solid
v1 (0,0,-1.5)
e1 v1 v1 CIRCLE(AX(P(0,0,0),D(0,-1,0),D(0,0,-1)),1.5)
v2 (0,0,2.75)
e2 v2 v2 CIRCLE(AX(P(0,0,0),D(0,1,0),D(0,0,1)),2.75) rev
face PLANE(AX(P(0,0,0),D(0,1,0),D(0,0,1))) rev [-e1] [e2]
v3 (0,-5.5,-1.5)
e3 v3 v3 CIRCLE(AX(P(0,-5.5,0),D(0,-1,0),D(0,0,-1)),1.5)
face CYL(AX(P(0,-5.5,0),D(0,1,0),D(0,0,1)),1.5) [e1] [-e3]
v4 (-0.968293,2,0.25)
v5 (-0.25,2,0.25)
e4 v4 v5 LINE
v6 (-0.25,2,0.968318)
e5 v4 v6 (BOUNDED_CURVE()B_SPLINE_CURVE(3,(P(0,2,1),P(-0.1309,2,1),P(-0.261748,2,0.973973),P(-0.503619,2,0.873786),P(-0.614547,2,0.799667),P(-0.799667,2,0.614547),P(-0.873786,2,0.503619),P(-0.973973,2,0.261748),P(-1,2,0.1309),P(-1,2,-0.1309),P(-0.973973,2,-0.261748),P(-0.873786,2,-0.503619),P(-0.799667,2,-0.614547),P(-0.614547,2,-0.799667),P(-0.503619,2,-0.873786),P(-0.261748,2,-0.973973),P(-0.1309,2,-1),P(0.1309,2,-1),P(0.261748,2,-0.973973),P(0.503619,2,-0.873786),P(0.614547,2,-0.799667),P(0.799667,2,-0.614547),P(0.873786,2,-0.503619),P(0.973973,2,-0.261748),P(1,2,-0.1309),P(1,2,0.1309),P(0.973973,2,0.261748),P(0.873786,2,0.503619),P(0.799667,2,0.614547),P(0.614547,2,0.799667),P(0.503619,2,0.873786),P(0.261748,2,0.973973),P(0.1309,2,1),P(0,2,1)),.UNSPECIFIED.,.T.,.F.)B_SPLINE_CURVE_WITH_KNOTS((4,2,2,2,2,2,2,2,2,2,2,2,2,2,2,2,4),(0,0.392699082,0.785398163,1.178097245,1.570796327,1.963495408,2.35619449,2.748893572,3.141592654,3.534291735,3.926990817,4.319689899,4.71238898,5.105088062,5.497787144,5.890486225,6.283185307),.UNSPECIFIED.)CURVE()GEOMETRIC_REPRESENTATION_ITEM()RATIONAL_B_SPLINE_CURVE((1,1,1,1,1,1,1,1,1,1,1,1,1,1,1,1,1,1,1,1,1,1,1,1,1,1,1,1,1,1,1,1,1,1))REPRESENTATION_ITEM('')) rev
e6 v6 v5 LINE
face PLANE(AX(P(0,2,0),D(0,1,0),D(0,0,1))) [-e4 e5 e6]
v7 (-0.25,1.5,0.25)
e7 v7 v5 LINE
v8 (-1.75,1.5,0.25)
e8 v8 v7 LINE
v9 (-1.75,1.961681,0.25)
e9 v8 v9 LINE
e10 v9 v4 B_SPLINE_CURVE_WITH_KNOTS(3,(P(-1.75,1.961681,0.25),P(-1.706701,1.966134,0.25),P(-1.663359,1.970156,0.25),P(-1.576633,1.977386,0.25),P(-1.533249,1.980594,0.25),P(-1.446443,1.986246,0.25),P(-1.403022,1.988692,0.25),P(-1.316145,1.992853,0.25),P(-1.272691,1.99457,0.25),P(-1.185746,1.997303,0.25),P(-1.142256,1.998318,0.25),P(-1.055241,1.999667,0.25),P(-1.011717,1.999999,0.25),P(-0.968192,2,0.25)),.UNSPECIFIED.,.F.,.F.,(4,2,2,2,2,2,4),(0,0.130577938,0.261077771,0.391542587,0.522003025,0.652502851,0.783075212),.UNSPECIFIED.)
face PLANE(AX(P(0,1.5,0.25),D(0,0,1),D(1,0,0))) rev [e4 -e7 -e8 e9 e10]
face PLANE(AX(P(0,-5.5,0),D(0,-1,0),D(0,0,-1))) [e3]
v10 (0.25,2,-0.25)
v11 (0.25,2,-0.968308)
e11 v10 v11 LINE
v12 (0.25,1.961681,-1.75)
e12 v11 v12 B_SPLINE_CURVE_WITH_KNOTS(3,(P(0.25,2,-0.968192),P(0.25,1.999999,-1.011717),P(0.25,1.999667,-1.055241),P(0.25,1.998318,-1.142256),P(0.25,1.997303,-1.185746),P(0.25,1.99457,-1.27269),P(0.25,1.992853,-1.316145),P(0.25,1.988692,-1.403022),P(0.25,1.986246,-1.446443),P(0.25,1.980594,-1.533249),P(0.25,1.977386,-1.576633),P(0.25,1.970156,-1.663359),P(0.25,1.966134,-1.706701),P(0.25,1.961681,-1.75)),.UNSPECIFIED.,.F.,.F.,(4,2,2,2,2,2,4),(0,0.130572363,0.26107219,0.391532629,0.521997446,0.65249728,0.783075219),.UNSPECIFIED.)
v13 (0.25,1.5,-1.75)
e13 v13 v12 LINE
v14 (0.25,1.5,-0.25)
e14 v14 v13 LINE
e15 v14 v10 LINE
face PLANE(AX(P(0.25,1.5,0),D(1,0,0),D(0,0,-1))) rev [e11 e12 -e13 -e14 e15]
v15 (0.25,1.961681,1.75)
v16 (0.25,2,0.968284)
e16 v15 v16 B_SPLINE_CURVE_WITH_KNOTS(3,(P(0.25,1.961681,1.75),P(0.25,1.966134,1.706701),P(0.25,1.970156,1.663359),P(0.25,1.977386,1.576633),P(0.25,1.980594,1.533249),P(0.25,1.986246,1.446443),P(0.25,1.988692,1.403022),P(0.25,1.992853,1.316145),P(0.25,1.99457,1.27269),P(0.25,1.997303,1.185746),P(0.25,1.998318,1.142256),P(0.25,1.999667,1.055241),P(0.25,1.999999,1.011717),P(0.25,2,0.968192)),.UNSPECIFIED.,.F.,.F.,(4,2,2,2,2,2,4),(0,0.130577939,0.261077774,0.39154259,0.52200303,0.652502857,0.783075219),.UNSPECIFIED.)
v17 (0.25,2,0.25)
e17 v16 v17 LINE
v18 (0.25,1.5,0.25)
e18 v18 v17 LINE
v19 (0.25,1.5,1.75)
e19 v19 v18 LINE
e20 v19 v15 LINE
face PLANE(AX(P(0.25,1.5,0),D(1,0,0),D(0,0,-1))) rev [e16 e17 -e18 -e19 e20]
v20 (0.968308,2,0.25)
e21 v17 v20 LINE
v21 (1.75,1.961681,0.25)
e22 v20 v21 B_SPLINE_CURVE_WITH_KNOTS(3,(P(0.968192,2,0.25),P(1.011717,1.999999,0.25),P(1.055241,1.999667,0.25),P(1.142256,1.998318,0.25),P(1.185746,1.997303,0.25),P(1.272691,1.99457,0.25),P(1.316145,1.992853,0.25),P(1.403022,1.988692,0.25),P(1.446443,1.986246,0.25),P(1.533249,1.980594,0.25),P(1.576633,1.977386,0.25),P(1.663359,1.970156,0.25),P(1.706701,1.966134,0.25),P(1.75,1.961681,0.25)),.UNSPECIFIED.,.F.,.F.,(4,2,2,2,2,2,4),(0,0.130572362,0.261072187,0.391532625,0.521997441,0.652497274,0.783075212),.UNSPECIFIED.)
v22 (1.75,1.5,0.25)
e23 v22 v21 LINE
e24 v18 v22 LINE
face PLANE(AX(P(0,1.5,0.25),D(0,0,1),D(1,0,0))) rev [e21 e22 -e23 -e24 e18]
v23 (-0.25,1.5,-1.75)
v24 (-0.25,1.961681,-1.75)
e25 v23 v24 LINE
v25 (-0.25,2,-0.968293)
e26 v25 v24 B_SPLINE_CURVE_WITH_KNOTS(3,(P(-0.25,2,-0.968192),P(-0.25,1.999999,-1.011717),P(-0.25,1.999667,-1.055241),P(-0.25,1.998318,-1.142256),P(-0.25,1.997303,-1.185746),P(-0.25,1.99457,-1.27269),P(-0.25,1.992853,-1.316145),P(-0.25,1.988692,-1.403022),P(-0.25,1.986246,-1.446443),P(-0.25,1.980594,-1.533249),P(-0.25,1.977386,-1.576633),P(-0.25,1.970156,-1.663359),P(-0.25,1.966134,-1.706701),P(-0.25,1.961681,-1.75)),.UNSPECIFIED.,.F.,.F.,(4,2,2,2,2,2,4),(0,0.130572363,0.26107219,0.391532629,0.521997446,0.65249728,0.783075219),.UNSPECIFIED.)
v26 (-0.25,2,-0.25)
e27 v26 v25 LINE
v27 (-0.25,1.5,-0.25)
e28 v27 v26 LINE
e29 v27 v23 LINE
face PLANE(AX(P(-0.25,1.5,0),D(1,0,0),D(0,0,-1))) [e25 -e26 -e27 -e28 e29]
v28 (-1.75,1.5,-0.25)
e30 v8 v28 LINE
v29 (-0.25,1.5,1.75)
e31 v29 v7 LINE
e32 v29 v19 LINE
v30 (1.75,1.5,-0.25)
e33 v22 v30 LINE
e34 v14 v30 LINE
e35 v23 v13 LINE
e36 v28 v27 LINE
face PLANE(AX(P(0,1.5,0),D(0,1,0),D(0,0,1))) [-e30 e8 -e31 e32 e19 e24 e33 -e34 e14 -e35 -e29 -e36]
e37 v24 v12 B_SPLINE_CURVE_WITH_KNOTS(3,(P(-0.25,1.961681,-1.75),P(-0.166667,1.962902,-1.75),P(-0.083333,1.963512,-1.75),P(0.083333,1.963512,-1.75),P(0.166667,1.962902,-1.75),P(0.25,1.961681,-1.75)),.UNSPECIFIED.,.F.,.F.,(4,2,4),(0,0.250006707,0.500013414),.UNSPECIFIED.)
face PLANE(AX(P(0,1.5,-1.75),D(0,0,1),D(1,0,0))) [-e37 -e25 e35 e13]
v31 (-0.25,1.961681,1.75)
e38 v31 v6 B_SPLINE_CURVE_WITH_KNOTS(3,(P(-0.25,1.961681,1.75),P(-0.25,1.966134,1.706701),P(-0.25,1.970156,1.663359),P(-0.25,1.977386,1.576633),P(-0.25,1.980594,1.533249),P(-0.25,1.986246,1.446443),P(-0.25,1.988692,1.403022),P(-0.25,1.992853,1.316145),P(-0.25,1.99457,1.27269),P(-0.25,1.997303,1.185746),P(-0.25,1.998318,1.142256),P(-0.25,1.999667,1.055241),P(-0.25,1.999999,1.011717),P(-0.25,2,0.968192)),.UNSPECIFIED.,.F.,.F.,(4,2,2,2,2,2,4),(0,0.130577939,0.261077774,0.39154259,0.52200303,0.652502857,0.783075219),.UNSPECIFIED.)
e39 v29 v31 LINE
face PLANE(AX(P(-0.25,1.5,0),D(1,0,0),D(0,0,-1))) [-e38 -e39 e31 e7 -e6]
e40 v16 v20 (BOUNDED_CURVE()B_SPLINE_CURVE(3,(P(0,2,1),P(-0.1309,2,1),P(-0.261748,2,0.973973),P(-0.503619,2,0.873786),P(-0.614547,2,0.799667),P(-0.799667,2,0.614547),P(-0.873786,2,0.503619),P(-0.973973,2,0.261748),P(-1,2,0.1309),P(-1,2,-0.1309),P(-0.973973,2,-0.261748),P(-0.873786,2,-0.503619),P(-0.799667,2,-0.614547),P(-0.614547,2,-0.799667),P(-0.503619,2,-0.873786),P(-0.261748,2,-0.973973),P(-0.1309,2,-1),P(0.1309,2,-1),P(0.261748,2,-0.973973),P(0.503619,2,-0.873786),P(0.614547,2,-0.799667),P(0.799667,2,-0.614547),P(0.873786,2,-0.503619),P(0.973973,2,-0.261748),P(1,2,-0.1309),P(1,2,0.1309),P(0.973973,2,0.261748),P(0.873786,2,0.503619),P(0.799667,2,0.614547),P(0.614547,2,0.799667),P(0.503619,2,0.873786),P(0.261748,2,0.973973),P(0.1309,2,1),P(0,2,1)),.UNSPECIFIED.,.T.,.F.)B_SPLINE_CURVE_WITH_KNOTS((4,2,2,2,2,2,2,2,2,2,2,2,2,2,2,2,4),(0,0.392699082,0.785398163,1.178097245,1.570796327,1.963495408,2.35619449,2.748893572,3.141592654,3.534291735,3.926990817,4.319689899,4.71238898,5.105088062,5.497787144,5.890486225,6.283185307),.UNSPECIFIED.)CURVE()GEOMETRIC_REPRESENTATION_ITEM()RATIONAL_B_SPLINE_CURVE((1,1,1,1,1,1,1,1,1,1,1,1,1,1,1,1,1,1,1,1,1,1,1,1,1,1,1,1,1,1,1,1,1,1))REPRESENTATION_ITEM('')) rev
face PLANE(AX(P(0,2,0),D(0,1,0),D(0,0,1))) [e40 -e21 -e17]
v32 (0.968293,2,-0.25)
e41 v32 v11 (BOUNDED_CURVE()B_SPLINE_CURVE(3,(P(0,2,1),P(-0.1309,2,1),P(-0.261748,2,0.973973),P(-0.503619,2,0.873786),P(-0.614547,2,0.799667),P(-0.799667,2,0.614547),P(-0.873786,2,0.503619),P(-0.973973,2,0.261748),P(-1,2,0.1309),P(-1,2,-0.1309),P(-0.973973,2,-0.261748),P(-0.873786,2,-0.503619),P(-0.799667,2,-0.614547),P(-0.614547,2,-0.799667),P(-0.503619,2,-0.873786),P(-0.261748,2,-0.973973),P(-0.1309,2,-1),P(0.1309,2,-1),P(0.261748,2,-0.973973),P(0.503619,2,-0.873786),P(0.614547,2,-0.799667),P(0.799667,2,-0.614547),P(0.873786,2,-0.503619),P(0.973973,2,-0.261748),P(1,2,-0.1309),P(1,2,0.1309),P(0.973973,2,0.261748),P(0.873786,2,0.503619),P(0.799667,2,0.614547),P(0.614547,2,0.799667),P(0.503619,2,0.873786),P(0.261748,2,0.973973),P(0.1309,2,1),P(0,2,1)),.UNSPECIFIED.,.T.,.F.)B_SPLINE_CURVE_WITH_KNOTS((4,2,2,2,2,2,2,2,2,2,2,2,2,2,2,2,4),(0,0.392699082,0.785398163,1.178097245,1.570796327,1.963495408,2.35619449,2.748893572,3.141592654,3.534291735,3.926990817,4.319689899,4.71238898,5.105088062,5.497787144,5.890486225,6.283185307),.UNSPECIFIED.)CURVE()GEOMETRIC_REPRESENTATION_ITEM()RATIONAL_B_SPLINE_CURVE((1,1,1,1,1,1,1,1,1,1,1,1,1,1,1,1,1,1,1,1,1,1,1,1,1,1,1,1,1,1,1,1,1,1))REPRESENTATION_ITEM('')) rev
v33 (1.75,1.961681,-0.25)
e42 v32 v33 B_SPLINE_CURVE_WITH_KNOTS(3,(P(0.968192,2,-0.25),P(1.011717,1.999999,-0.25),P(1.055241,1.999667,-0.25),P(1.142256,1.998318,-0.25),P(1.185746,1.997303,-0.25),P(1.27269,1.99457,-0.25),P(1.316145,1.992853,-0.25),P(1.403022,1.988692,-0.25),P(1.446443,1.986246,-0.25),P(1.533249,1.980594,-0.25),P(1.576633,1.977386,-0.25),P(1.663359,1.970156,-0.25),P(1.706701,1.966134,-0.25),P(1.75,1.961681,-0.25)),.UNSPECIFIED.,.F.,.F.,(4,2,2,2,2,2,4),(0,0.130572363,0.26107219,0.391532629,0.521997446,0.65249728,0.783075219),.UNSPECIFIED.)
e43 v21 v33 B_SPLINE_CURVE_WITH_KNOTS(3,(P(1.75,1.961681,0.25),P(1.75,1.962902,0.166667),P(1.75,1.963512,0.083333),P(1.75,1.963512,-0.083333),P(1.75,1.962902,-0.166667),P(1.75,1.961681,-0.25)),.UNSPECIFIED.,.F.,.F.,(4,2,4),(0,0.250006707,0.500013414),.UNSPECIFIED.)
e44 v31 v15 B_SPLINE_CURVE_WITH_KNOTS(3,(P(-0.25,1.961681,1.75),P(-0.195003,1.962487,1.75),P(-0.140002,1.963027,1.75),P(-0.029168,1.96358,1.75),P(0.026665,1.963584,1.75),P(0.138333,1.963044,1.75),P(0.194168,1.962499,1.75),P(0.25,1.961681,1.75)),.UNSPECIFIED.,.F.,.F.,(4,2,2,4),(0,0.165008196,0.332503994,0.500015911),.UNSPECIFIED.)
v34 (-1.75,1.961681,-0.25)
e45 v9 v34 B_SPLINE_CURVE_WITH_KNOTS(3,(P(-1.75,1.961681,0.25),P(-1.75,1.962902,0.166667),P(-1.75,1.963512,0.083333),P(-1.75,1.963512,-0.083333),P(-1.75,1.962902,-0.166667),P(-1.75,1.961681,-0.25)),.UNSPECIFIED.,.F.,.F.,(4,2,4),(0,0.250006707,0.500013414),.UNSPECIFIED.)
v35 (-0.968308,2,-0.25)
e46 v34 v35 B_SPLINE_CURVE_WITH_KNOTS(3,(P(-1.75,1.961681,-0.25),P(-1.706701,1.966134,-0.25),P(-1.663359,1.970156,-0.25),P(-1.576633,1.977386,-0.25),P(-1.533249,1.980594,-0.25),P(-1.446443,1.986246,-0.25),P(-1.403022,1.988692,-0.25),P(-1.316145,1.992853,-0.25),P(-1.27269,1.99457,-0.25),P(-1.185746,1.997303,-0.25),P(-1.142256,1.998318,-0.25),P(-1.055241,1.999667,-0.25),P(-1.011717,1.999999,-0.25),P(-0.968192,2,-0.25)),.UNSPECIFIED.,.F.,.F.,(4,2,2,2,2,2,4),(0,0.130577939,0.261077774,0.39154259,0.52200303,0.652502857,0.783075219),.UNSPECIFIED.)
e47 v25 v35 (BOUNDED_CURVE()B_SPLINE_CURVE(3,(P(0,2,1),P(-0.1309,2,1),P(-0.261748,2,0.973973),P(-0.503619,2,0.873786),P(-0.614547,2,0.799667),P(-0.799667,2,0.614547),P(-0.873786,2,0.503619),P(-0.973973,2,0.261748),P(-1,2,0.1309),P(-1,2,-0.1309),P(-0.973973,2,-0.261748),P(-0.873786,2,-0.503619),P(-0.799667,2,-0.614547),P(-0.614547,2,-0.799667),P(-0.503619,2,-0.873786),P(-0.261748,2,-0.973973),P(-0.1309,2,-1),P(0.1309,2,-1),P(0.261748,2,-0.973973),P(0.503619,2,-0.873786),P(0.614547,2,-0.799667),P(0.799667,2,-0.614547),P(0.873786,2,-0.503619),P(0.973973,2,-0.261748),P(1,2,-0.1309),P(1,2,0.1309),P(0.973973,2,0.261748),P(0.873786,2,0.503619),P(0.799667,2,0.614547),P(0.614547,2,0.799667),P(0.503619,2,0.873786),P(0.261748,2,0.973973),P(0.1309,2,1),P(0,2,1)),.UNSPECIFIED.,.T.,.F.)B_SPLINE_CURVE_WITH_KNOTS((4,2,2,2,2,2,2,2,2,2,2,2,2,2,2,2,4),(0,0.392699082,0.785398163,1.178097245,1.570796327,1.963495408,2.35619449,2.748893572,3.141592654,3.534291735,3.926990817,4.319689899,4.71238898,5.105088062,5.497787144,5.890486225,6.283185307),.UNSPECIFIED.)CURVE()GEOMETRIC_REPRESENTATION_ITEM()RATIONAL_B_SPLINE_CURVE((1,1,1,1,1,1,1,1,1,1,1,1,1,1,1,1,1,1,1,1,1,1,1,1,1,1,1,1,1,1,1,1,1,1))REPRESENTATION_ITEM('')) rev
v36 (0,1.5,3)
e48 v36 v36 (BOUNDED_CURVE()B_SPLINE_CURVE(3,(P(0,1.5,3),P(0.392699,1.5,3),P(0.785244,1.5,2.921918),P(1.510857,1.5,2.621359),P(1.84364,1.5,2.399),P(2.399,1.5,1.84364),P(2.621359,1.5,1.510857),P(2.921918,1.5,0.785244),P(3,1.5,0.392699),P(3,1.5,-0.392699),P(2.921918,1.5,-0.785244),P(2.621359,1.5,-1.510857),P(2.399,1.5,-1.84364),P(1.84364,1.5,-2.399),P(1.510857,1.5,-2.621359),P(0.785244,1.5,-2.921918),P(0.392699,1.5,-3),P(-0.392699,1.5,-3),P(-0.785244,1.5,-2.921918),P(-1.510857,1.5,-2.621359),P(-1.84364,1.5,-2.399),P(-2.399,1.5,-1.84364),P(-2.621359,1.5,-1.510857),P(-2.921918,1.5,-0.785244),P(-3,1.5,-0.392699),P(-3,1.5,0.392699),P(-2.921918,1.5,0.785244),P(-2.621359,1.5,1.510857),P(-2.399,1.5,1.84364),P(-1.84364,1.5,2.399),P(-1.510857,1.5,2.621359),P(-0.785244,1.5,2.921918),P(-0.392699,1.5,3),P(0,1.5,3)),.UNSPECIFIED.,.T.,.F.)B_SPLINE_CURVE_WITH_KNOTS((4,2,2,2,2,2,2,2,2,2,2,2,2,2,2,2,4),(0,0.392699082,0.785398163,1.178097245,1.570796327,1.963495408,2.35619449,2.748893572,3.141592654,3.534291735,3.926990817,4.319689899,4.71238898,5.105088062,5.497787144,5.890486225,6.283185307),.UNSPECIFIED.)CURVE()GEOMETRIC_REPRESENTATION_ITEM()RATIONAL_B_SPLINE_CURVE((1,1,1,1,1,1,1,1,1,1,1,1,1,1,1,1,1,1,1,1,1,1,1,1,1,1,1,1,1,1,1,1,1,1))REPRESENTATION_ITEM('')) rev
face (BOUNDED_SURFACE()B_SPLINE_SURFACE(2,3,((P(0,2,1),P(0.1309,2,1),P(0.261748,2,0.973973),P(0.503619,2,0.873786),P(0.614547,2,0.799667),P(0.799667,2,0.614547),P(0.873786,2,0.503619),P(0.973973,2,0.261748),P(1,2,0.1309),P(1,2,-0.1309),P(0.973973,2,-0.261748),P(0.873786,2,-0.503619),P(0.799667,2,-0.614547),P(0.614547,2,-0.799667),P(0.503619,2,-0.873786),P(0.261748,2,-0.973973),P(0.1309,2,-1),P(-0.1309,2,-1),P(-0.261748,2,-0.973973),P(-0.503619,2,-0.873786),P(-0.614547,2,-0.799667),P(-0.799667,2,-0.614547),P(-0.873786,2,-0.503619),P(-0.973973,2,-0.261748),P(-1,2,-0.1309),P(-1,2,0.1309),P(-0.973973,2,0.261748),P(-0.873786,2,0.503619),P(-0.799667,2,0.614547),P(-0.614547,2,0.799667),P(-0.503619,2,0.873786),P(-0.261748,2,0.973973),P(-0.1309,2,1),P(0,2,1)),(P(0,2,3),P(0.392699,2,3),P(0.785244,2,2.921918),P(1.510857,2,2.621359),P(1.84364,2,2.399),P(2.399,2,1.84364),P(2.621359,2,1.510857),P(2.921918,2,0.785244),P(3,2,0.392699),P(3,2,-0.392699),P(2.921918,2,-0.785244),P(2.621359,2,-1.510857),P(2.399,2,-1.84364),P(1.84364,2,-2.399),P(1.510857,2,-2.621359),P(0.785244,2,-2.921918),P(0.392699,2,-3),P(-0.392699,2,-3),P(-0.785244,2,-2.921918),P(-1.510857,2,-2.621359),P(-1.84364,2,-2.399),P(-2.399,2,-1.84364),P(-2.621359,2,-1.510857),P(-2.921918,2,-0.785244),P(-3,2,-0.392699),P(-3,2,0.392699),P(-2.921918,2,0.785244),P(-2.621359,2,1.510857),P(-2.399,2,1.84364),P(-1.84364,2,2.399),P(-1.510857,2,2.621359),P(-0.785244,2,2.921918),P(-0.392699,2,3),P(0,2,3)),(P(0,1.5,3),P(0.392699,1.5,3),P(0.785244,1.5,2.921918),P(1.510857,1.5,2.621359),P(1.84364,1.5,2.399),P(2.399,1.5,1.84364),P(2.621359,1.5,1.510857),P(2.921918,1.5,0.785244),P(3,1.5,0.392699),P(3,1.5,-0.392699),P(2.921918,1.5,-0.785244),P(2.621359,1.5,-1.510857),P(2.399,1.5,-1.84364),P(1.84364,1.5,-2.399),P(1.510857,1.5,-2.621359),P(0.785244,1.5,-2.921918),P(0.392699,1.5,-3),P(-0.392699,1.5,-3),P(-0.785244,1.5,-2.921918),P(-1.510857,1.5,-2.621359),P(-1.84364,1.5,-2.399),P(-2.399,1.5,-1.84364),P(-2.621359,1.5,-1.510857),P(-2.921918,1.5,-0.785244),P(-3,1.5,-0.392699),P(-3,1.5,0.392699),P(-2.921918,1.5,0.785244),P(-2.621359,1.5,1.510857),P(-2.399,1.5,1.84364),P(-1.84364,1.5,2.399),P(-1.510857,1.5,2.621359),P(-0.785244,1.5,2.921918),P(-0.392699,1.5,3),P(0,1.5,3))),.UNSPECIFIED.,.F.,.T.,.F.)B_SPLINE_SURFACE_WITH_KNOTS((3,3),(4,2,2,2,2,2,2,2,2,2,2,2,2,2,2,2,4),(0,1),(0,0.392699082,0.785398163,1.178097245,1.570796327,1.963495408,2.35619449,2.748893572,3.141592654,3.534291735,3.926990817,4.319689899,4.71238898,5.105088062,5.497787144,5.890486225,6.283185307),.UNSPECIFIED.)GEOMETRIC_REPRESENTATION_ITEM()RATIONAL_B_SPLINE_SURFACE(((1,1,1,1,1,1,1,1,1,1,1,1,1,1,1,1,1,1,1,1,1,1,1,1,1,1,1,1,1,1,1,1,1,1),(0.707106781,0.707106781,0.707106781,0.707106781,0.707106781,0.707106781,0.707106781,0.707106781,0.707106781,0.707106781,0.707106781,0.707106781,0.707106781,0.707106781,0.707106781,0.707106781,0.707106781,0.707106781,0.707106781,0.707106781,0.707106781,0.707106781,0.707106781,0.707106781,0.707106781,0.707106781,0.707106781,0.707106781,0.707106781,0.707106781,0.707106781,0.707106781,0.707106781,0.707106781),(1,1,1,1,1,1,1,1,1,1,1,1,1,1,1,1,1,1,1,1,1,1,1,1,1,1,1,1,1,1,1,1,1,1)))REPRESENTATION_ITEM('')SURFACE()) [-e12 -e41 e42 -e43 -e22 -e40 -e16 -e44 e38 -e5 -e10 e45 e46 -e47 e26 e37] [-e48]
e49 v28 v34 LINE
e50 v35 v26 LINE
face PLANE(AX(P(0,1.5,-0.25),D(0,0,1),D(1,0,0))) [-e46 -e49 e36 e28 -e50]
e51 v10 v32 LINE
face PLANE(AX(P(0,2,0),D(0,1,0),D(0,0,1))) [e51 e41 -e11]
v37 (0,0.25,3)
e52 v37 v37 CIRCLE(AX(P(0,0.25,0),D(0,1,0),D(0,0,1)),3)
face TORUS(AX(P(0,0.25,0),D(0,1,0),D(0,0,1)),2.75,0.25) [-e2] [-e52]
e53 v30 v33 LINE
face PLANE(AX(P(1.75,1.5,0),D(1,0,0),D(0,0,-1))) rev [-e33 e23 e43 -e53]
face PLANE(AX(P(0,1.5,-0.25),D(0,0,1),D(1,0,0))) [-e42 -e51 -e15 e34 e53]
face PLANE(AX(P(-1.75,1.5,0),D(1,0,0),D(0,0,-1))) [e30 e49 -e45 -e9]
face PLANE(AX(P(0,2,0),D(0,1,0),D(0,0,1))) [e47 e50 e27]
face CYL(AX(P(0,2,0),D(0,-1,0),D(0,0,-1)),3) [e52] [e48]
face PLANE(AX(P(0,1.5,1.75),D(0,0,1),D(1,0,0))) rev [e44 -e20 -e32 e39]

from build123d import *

# Parameters (mm, degrees)
SKETCH1_R           = 3
BOSS_EXTRUDE1_DEPTH = 2
SKETCH2_R           = 1.5
BOSS_EXTRUDE2_DEPTH = 5.5
FILLET2_SIZE        = 0.5
FILLET2_SIZE_2      = 2
SKETCH3_W           = 3.5
SKETCH3_H           = 0.5
SKETCH3_W_2         = 0.5
SKETCH3_H_2         = 3.5
CUT_EXTRUDE1_DEPTH  = 0.5
FILLET3_R           = 0.25


with BuildPart() as part:
    # Sketch1 → Boss-Extrude1 (new body)
    with BuildSketch(Plane(origin=(0, 0, 0), x_dir=(1, 0, 0), z_dir=(0, 1, 0))):
        with Locations(Location((0, 0, 0), (0, 0, 270))):
            Circle(SKETCH1_R)
    extrude(amount=BOSS_EXTRUDE1_DEPTH)

    # Sketch2 → Boss-Extrude2 (add)
    with BuildSketch(Plane.XZ):
        with Locations(Location((0, 0, 0), (0, 0, 270))):
            Circle(SKETCH2_R)
    extrude(amount=BOSS_EXTRUDE2_DEPTH)

    # Fillet2
    # an asymmetric fillet: 2, 0.5 mm, written as the material it takes off along each edge
    with BuildSketch(Plane(origin=(0, 2, 0), x_dir=(0, 0, 1), z_dir=(-1, 0, 0))) as fillet2_piece_1:
        with BuildLine():
            Bezier((3, -FILLET2_SIZE), (3, 0), (3 - FILLET2_SIZE_2, 0), weights=[1, 0.707106781, 1])
            Line((3 - FILLET2_SIZE_2, 0), (3, 0))
            Line((3, 0), (3, -FILLET2_SIZE))
        make_face()
    revolve(axis=Axis((0, 2, 0), (0, 1, 0)), mode=Mode.SUBTRACT)

    # Sketch3 → Cut-Extrude1 (cut)
    with BuildSketch(Plane(origin=(0, 2, 0), x_dir=(1, 0, 0), z_dir=(0, 1, 0))):
        Rectangle(SKETCH3_W, SKETCH3_H)
        Rectangle(SKETCH3_W_2, SKETCH3_H_2)
    extrude(amount=-CUT_EXTRUDE1_DEPTH, mode=Mode.SUBTRACT)

    # Fillet3
    fillet3_edges = [part.edges().sort_by_distance(p)[0] for p in [
        (0, 0, -3),
    ]]
    fillet(fillet3_edges, radius=FILLET3_R)


solid = part.part
